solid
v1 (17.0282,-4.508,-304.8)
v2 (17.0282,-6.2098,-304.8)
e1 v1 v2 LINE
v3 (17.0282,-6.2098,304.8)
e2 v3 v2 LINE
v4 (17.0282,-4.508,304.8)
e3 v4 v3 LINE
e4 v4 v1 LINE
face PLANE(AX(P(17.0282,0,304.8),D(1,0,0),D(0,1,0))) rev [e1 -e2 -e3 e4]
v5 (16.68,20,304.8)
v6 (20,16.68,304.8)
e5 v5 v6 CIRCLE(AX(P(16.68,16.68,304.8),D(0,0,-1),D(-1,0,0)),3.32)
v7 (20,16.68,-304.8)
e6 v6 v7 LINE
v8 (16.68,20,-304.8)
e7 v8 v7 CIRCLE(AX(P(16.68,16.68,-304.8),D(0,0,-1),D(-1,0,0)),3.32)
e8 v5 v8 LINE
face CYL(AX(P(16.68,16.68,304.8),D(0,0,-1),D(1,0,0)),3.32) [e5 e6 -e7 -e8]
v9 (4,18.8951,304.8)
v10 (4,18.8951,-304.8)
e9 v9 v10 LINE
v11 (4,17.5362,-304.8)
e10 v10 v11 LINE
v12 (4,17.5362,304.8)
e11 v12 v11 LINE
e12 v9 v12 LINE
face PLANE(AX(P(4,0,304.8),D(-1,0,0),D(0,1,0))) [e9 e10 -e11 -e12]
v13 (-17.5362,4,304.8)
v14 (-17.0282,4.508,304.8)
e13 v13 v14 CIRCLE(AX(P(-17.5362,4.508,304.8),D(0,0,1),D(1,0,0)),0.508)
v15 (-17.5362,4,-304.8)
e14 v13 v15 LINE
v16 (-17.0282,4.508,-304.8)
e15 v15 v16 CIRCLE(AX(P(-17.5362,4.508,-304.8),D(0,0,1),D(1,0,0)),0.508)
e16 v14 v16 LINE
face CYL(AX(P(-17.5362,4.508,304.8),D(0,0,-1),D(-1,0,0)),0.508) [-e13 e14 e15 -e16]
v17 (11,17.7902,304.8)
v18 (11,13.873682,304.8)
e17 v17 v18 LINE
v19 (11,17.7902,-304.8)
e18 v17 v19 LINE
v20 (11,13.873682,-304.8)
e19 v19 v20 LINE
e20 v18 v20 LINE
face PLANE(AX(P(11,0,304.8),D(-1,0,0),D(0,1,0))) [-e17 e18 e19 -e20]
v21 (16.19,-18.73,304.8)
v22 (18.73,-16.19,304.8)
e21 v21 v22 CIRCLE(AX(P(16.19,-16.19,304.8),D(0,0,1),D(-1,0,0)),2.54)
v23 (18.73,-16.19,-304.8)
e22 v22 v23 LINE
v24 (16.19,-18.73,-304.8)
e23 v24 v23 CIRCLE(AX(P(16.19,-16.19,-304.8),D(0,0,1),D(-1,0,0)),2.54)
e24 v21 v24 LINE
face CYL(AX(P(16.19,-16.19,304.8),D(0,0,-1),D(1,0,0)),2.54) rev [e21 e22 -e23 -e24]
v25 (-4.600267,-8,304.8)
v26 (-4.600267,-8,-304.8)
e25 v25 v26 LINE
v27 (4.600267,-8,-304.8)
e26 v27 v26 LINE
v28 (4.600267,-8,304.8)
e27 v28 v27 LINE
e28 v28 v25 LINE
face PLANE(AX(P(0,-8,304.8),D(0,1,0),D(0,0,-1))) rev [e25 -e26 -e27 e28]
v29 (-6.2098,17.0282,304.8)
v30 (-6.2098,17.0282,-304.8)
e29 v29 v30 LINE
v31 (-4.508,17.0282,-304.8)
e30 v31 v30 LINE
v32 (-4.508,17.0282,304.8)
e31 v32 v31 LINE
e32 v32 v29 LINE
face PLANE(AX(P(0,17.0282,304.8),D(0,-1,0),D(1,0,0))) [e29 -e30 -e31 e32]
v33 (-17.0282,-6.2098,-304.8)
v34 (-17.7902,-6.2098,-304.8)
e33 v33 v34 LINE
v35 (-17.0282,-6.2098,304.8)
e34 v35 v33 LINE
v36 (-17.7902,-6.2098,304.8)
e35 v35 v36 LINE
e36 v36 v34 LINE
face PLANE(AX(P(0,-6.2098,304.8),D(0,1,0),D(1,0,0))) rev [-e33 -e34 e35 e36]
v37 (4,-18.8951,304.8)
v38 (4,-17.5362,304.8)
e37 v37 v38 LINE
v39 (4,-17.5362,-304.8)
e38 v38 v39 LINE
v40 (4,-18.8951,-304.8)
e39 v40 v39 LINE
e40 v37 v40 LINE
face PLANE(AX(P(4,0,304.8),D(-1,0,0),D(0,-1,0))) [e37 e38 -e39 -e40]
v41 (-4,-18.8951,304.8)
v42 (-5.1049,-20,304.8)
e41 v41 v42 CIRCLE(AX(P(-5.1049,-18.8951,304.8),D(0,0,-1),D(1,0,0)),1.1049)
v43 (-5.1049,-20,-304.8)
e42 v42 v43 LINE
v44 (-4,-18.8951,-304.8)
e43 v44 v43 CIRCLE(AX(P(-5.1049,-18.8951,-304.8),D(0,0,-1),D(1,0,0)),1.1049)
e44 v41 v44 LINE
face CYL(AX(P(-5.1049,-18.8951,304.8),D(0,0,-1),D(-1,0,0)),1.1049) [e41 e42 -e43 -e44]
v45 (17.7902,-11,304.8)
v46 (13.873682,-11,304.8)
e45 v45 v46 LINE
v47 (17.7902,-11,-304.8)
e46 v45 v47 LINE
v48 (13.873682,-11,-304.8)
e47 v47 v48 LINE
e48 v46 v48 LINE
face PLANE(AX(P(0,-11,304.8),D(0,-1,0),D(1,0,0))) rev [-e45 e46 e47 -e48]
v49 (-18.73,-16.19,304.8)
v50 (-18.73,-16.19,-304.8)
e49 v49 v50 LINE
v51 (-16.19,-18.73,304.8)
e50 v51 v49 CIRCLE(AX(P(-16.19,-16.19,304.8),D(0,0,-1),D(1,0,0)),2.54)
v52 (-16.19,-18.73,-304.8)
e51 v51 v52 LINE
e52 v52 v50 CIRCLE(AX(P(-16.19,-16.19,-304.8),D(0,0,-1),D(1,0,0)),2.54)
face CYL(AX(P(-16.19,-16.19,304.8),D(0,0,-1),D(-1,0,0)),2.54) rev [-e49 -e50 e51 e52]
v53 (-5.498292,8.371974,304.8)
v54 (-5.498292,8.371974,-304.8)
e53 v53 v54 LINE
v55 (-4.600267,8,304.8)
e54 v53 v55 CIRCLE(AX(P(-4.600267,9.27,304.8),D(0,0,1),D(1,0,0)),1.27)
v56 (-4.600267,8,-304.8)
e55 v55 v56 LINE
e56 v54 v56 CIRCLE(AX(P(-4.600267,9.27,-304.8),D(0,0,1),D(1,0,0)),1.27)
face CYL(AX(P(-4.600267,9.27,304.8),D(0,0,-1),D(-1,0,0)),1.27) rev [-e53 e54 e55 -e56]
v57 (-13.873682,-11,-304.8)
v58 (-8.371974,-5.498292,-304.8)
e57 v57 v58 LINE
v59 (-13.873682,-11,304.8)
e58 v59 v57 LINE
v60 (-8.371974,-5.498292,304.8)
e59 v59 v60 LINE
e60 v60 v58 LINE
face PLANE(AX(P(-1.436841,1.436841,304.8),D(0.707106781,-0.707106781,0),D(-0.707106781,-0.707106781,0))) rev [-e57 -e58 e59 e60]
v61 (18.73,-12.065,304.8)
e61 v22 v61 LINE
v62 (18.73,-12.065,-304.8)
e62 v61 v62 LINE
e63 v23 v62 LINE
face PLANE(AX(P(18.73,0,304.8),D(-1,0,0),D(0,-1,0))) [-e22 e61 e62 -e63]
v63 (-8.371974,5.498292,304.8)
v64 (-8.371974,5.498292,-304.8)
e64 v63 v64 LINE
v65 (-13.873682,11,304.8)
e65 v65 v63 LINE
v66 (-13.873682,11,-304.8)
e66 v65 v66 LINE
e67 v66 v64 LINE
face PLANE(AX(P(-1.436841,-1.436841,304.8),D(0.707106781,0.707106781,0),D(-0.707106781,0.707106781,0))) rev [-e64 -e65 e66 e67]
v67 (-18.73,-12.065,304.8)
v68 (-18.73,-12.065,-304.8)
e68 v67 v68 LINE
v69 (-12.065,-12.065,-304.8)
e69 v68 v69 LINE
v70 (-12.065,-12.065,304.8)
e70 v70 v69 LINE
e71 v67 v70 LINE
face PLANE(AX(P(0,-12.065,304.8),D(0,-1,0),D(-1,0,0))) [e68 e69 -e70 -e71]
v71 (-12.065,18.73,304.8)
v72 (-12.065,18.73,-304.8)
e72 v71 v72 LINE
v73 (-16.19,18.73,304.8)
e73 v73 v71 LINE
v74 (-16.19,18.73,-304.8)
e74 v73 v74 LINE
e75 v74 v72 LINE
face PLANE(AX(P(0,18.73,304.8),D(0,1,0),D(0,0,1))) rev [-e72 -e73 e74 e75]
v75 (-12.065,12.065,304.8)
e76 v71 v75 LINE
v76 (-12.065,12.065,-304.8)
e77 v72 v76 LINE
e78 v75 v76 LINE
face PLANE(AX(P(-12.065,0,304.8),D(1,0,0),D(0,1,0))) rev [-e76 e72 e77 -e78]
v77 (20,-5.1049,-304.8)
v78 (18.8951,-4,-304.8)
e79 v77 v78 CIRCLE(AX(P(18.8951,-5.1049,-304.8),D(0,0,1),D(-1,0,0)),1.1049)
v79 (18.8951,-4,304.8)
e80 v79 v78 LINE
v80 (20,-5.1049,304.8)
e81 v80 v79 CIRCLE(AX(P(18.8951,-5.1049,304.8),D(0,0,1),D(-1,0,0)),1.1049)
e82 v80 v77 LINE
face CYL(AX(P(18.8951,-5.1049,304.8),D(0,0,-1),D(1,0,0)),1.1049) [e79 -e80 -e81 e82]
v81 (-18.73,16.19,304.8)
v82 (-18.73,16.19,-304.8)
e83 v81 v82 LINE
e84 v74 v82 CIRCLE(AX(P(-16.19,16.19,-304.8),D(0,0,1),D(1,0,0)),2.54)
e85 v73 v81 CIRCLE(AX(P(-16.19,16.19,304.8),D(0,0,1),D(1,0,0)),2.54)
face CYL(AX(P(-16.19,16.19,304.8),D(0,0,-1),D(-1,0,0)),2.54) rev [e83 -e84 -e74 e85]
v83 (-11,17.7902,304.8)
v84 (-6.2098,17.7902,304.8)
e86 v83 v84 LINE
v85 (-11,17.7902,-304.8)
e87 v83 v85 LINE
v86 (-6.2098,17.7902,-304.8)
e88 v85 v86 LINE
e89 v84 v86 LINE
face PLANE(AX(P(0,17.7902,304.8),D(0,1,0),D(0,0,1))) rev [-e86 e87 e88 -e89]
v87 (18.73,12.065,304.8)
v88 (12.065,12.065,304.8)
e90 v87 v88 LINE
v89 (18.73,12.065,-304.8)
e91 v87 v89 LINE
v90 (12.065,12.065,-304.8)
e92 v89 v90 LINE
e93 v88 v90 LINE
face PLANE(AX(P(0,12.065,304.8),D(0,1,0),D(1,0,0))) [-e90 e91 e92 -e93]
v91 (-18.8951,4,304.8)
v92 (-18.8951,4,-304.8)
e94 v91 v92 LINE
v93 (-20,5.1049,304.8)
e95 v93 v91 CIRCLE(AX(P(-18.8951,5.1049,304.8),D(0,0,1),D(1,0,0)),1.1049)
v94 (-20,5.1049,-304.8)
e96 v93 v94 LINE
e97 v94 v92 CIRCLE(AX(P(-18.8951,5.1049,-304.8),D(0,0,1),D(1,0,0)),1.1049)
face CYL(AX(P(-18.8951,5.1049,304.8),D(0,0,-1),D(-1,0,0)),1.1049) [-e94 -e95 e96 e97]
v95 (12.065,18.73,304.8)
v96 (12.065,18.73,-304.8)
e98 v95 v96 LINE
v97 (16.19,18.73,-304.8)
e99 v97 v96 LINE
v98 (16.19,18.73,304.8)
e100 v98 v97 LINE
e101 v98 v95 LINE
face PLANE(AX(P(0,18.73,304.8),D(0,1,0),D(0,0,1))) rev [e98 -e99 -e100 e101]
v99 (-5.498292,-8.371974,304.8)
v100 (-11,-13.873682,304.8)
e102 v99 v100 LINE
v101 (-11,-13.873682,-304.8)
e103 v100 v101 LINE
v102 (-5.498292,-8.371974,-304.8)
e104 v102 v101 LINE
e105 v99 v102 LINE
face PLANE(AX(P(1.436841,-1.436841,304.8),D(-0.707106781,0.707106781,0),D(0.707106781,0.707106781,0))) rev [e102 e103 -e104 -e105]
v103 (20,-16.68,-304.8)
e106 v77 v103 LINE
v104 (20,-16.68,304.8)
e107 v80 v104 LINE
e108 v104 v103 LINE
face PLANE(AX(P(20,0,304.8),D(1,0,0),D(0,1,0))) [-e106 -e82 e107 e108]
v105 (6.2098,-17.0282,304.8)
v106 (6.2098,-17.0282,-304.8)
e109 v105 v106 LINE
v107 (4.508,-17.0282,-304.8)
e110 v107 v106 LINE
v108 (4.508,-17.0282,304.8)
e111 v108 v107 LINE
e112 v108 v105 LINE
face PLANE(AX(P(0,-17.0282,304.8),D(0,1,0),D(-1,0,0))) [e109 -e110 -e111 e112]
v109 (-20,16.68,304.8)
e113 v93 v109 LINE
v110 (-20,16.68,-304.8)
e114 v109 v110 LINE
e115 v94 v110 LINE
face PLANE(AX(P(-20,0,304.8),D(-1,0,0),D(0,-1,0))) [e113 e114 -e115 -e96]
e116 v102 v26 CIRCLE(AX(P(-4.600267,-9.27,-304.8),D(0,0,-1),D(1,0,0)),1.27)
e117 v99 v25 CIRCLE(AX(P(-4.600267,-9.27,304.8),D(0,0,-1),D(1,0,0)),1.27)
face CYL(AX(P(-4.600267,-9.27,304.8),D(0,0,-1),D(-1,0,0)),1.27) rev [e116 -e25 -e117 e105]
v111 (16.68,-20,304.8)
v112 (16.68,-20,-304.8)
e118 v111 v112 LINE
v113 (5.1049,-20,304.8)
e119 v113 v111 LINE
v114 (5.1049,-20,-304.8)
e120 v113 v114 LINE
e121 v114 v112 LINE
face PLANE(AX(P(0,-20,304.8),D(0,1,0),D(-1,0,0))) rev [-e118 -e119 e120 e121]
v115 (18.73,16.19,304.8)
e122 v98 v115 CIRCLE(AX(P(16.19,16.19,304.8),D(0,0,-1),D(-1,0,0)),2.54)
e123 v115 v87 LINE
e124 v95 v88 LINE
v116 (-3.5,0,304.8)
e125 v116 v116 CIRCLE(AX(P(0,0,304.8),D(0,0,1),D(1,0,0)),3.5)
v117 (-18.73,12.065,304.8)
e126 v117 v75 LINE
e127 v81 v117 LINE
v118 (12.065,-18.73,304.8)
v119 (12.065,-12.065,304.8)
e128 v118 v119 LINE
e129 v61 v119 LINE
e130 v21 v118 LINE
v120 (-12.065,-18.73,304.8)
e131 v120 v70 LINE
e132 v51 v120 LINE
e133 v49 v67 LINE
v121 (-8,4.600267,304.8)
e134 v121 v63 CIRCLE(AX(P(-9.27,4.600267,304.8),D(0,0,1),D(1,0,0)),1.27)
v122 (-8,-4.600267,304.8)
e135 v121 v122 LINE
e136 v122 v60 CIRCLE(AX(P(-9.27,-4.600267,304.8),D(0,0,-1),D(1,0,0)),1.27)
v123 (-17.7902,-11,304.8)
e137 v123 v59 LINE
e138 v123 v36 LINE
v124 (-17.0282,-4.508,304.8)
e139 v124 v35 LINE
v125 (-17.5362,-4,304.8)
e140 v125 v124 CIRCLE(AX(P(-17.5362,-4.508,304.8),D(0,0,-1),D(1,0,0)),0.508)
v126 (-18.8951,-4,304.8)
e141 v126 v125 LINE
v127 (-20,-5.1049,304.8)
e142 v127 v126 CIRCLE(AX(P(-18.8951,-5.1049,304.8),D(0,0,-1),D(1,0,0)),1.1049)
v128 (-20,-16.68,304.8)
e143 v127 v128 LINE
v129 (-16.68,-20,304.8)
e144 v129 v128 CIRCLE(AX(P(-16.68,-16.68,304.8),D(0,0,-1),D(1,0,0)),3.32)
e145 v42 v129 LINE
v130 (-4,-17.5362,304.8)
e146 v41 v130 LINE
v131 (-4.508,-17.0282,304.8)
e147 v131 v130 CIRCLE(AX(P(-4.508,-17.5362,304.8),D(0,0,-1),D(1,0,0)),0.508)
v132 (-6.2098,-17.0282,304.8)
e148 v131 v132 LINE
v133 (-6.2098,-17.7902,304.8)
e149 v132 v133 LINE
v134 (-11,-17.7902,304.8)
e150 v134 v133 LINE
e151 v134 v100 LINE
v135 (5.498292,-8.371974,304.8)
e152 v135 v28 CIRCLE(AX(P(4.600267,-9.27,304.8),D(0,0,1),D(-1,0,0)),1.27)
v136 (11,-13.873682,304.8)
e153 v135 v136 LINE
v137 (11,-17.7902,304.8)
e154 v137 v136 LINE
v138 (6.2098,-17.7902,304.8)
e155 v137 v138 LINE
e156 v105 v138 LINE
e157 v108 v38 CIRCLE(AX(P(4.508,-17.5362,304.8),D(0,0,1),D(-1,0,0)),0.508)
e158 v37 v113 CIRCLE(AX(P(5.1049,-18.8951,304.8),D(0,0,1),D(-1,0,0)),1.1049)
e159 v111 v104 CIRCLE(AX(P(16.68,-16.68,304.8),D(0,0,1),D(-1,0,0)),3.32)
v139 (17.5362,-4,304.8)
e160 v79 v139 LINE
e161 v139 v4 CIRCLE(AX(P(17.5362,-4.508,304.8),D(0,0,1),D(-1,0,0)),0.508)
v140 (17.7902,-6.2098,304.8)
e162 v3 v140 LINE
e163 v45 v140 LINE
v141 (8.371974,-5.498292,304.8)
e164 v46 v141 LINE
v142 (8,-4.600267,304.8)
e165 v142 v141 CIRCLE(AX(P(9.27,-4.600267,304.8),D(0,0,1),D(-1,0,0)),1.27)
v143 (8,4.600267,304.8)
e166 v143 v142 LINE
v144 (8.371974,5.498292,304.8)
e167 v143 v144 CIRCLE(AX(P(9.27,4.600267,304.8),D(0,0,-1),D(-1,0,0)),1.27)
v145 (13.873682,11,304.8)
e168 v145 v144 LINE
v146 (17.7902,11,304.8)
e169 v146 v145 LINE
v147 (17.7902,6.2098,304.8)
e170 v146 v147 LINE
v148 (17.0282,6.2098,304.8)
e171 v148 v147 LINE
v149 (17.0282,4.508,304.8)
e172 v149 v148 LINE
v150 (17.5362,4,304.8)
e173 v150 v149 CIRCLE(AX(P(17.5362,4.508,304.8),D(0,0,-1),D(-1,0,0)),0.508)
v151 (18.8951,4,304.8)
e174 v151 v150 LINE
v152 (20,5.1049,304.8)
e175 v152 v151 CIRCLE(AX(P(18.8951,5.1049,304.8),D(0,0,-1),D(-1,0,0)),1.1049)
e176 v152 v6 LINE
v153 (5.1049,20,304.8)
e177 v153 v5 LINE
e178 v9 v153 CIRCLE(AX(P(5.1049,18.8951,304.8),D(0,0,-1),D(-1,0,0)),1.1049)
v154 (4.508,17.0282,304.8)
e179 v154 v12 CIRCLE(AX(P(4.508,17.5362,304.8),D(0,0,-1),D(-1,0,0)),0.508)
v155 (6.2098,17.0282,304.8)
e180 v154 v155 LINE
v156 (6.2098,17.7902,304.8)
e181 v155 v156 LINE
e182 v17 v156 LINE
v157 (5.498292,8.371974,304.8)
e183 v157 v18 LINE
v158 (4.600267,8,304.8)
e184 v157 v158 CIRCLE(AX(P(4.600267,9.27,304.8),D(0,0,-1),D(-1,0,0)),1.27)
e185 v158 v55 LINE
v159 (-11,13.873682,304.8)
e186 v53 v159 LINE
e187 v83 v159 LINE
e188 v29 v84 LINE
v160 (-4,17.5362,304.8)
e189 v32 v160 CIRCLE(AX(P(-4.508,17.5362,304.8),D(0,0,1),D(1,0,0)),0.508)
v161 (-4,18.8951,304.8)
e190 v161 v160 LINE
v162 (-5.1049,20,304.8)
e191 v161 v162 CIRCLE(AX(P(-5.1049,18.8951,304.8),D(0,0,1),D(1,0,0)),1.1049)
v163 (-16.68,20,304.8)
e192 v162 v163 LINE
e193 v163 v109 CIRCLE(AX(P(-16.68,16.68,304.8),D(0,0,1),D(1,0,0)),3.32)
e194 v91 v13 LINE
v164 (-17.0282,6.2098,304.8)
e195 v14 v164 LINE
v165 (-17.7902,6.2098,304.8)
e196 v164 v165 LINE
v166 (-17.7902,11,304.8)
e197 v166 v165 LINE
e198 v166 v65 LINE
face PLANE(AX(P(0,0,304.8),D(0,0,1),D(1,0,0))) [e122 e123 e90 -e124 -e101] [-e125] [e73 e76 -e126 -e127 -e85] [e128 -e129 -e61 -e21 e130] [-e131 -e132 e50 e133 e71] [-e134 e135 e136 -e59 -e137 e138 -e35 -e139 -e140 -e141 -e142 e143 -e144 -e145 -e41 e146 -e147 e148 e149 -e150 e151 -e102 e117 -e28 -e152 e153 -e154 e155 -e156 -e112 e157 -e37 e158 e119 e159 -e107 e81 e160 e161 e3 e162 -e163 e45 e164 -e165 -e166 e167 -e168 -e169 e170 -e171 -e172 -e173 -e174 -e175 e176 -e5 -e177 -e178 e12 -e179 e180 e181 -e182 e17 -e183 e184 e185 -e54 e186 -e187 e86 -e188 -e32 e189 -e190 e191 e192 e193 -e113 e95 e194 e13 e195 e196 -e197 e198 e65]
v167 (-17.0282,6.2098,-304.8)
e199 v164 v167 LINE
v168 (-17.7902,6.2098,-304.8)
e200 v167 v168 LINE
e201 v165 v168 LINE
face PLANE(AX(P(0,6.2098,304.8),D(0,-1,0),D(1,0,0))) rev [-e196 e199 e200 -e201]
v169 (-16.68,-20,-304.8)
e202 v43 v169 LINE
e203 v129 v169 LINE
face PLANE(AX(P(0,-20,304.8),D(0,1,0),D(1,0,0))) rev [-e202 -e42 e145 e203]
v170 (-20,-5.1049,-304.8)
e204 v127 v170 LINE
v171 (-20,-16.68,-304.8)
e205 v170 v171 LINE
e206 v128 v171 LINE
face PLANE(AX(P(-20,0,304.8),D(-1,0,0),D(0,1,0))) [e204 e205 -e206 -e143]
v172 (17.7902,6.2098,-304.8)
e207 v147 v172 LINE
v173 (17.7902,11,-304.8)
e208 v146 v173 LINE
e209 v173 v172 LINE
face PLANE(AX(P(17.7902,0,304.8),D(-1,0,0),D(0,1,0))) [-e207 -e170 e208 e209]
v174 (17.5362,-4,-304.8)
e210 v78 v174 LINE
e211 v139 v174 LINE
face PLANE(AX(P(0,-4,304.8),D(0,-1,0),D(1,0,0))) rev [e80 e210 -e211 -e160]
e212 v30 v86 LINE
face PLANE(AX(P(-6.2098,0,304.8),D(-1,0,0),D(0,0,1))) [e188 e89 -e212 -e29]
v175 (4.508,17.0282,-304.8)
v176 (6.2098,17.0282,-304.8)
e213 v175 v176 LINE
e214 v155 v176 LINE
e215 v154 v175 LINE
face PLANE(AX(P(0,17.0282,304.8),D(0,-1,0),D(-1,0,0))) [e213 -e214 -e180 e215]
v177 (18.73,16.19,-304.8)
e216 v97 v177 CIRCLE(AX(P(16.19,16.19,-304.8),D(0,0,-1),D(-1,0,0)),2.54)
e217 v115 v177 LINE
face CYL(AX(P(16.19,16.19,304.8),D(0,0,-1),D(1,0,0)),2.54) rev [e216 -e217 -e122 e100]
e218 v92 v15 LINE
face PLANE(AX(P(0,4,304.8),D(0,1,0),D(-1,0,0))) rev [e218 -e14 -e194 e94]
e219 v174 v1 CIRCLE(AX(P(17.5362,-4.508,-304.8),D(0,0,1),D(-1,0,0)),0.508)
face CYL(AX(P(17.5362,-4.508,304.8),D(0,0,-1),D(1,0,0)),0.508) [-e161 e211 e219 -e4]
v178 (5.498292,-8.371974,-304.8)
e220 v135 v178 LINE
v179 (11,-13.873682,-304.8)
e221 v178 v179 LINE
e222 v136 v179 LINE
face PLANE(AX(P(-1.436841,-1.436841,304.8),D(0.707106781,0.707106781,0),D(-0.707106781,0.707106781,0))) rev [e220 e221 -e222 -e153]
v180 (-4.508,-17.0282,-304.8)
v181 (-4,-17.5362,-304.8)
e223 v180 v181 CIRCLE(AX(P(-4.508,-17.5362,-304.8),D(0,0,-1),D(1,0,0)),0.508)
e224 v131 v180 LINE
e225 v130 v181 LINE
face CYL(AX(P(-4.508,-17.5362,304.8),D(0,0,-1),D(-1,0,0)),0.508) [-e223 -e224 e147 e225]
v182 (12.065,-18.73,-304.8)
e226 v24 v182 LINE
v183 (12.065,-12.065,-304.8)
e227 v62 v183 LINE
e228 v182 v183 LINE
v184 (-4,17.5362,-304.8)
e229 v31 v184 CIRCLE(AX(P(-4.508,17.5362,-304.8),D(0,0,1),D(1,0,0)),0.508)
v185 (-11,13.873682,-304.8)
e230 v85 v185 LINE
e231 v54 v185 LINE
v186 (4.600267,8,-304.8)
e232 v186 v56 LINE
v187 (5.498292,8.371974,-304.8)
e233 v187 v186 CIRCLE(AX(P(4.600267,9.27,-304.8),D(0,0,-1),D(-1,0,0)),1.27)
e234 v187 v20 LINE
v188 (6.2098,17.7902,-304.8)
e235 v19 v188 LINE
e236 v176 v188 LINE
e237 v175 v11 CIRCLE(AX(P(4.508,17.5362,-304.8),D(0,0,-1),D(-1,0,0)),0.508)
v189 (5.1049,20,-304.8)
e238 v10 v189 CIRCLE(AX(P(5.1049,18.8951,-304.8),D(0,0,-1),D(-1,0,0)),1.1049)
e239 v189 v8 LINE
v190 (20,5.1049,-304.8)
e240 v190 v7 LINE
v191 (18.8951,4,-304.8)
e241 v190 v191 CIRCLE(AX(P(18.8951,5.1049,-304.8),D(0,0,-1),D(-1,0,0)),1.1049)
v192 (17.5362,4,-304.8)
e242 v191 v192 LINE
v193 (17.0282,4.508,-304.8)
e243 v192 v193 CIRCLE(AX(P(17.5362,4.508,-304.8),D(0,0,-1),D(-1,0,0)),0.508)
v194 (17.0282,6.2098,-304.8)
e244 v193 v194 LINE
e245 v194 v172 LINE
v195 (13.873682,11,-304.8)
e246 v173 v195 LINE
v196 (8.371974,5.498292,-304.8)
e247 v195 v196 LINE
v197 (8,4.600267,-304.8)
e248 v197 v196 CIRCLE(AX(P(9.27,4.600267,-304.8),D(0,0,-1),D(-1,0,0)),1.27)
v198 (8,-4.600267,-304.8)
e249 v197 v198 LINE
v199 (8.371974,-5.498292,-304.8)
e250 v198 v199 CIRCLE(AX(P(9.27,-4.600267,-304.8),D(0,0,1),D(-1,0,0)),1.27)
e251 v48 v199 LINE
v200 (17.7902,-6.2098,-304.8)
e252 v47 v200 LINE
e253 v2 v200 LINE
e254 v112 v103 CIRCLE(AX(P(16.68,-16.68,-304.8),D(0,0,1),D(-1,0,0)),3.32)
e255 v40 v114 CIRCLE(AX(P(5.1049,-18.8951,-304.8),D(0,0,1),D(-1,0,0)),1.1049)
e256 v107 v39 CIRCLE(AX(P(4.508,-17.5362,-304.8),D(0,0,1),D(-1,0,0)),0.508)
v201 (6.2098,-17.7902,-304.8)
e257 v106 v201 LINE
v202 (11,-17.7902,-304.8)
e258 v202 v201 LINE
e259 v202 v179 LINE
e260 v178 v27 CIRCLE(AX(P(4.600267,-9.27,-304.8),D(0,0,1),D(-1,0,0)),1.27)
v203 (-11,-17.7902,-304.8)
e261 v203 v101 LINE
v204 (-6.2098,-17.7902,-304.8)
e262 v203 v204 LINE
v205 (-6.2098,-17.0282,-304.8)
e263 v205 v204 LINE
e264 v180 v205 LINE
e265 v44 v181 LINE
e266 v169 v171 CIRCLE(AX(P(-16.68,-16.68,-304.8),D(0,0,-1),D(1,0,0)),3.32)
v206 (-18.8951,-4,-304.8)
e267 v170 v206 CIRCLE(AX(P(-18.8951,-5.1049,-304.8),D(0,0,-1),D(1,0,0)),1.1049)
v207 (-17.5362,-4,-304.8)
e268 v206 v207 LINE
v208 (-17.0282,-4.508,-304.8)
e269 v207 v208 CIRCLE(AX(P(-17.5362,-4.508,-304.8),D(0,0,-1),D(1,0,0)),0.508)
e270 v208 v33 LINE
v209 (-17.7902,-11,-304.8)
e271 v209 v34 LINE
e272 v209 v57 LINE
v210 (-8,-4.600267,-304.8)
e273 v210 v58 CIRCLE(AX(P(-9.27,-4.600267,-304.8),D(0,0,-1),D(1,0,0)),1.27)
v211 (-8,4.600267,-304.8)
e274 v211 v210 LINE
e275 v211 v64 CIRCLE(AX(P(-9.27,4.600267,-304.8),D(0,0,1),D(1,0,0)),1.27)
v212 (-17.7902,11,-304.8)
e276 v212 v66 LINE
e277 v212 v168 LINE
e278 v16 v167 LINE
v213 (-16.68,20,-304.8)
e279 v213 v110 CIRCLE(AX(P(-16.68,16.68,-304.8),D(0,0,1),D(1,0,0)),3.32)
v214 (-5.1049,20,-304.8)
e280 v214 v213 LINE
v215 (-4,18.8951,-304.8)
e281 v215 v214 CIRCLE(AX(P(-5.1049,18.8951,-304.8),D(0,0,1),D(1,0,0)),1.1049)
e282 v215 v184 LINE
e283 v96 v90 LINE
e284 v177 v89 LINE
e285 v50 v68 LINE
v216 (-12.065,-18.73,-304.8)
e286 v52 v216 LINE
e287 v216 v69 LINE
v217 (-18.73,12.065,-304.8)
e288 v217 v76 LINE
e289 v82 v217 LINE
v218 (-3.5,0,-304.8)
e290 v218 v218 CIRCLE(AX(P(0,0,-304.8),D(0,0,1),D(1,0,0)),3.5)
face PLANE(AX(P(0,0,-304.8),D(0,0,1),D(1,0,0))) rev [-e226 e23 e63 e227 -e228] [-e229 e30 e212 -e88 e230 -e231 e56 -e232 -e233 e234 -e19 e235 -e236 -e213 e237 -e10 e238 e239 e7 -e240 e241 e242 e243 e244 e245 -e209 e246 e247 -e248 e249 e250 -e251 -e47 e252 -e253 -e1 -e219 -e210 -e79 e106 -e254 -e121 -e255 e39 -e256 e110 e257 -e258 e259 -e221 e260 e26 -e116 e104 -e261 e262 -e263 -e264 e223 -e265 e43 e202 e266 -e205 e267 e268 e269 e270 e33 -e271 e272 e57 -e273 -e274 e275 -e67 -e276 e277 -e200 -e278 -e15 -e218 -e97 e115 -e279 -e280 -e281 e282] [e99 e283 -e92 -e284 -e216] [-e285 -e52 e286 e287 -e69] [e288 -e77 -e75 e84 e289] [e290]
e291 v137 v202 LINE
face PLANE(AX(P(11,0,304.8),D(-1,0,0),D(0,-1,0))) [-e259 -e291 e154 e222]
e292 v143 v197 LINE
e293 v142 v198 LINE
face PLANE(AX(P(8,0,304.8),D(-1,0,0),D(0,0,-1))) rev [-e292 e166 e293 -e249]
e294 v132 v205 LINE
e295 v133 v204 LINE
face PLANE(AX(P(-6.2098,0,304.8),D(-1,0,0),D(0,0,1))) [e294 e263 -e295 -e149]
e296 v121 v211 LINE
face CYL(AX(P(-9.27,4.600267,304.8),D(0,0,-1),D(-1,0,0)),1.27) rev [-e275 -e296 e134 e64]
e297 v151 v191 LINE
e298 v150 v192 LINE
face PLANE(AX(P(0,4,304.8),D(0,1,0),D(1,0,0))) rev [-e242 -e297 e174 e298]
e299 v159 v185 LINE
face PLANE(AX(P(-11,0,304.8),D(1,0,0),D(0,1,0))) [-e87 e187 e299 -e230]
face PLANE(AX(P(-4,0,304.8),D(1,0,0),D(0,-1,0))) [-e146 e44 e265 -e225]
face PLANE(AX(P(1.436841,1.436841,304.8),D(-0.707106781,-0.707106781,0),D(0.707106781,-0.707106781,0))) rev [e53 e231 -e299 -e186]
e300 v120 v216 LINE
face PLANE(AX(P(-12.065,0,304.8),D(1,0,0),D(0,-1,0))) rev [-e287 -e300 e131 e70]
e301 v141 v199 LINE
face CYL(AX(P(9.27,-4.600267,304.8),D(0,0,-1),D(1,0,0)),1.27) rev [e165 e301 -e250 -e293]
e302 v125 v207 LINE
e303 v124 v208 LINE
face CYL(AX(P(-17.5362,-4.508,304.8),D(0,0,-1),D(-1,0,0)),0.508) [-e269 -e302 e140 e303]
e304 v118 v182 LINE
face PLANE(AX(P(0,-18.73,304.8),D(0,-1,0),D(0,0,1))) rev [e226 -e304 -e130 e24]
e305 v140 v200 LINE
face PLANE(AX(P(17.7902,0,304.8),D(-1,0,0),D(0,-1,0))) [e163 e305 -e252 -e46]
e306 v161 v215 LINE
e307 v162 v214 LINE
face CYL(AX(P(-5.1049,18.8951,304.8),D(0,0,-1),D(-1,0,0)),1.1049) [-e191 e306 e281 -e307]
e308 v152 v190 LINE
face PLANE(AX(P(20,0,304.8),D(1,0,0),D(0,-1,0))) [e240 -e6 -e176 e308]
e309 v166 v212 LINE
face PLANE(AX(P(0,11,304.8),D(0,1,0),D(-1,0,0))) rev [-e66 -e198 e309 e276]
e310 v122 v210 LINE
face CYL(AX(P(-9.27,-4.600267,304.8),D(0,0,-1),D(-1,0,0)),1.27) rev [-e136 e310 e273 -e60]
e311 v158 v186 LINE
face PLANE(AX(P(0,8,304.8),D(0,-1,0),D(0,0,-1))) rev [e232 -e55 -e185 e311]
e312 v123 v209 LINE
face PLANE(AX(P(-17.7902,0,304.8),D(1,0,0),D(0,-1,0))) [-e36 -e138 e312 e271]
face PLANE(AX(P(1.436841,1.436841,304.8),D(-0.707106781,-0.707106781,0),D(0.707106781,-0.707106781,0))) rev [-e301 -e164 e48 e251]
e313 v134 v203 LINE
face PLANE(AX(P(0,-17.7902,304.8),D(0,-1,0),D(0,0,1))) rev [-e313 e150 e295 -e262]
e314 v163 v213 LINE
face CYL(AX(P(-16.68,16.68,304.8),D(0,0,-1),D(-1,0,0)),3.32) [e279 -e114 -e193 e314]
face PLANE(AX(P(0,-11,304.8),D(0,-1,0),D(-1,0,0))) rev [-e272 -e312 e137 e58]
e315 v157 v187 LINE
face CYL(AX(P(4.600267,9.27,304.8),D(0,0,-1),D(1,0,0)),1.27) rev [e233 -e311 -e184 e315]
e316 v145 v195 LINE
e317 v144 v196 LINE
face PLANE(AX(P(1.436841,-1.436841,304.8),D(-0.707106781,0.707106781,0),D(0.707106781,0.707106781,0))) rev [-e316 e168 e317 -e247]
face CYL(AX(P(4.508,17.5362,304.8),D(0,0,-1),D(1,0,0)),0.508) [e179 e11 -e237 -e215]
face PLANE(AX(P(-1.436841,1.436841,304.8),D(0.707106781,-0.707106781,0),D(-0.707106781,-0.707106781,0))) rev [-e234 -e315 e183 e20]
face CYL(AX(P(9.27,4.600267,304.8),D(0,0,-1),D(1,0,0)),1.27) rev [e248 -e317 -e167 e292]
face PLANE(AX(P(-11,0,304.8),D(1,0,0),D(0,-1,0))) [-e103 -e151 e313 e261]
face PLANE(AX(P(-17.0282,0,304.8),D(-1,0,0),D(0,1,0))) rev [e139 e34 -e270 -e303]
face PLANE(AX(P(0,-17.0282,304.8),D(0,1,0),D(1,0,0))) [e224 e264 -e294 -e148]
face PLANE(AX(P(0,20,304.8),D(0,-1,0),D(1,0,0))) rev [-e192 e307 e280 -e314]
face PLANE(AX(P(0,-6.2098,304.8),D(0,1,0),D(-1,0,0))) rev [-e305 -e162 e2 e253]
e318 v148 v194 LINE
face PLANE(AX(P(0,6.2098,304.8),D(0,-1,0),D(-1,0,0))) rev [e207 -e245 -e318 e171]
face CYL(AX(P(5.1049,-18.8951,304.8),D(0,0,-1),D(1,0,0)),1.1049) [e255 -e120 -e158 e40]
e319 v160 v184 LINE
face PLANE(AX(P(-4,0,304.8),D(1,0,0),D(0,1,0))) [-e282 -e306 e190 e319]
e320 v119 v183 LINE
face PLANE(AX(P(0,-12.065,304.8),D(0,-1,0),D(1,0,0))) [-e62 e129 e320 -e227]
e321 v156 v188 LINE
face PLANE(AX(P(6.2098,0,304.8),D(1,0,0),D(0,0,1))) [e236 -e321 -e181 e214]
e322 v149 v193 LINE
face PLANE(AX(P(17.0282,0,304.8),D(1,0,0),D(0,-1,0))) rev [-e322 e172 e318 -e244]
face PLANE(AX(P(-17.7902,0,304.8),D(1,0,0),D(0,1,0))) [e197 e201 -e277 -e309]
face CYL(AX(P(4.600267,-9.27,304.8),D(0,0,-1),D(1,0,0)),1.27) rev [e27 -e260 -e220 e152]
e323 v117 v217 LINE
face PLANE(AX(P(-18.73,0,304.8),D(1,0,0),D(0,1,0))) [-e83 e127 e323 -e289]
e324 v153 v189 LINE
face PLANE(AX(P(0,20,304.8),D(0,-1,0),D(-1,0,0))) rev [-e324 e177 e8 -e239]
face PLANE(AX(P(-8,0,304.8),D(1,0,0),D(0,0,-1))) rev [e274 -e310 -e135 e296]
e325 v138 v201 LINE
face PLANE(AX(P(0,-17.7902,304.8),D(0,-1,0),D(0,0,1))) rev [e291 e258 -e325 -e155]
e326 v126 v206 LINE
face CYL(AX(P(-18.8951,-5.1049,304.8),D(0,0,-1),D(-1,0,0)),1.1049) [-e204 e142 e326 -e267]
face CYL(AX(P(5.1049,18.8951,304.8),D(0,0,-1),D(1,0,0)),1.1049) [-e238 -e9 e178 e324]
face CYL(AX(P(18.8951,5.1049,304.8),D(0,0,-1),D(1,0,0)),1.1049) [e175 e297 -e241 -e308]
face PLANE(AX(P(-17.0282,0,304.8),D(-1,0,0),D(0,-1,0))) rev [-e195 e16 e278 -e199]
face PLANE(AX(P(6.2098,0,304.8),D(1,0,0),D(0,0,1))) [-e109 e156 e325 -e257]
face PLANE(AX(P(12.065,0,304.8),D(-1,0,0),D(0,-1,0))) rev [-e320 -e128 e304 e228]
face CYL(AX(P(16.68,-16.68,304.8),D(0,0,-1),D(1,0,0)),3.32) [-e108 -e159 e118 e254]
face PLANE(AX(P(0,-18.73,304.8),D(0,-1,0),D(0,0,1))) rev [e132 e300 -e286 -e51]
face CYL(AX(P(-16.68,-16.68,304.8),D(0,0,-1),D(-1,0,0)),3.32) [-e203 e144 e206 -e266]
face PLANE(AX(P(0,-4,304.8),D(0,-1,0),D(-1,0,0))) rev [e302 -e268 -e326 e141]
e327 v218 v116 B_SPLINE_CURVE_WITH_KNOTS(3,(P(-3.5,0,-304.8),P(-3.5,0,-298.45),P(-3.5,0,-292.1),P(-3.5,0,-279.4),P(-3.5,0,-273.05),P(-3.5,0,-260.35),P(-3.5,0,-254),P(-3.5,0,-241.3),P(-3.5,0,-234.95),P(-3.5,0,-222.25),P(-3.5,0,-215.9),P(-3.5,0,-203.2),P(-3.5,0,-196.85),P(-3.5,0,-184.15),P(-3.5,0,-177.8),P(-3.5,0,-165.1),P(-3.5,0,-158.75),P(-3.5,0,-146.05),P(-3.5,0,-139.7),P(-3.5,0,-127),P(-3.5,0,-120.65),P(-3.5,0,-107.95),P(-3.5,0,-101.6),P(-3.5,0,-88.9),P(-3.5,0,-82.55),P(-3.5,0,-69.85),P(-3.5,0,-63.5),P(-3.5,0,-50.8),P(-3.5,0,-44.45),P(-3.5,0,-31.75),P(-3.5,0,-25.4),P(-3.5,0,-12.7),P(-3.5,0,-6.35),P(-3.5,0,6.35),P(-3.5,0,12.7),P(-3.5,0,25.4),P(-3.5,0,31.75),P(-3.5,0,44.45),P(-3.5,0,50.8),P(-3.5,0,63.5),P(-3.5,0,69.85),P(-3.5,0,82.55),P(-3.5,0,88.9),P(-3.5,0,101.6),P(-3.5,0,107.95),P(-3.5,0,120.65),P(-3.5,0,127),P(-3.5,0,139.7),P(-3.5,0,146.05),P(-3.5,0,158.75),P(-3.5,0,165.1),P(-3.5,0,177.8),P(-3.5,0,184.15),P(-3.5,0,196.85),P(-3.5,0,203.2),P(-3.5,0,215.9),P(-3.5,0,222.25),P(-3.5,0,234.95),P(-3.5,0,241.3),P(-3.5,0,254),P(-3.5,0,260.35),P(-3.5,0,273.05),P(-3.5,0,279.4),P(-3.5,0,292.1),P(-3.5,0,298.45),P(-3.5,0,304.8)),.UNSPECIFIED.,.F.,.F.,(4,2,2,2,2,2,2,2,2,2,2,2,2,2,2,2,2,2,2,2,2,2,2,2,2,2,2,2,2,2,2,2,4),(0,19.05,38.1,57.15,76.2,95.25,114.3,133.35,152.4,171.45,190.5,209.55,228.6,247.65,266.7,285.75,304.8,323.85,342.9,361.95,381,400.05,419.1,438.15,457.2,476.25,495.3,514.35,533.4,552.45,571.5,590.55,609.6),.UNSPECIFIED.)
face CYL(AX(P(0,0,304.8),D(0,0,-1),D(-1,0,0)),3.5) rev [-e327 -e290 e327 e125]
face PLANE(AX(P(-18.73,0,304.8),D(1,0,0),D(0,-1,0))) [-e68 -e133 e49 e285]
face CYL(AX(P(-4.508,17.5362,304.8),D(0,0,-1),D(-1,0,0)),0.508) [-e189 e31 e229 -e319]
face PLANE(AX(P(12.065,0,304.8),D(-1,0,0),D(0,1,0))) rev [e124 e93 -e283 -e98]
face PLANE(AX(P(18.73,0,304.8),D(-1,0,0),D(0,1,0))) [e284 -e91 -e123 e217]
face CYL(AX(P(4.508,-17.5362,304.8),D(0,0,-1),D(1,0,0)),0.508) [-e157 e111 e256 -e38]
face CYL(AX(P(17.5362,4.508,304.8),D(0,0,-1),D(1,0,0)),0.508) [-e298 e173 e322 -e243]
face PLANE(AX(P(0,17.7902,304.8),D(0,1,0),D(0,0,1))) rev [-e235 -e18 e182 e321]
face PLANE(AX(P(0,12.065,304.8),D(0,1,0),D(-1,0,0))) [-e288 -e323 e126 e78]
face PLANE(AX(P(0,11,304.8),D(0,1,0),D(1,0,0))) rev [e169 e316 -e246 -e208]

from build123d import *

# Parameters (mm, degrees)
BOSS_EXTRUDE1_DEPTH = 304.8
MIRROR3_START       = -304.8
MIRROR3_DEPTH       = 609.6


# Read off the part's stored shape, not the designer's step: Mirror3
with BuildPart() as part:
    # Sketch3 → Boss-Extrude1 (new, symmetric)
    with BuildSketch(Plane.XY):
        with BuildLine():
            Line((0, 8), (0, 3.5))
            ThreePointArc((0, 3.5), (-2.474873734, 2.474873734), (-3.5, 0))
            Line((-3.5, 0), (-8, 0))
            Line((-8, 0), (-8, 4.600266817))
            ThreePointArc((-8, 4.600266817), (-8.096672994, 5.086274776), (-8.371974388, 5.498292429))
            Line((-8.371974388, 5.498292429), (-13.873681959, 11))
            Line((-13.873681959, 11), (-17.7902, 11))
            Line((-17.7902, 11), (-17.7902, 6.2098))
            Line((-17.7902, 6.2098), (-17.0282, 6.2098))
            Line((-17.0282, 6.2098), (-17.0282, 4.508))
            ThreePointArc((-17.0282, 4.508), (-17.176989755, 4.148789755), (-17.5362, 4))
            Line((-17.5362, 4), (-18.8951, 4))
            ThreePointArc((-18.8951, 4), (-19.676382283, 4.323617717), (-20, 5.1049))
            Line((-20, 5.1049), (-20, 16.68))
            ThreePointArc((-20, 16.68), (-19.027594514, 19.027594514), (-16.68, 20))
            Line((-16.68, 20), (-5.1049, 20))
            ThreePointArc((-5.1049, 20), (-4.323617717, 19.676382283), (-4, 18.8951))
            Line((-4, 18.8951), (-4, 17.5362))
            ThreePointArc((-4, 17.5362), (-4.148789755, 17.176989755), (-4.508, 17.0282))
            Line((-4.508, 17.0282), (-6.2098, 17.0282))
            Line((-6.2098, 17.0282), (-6.2098, 17.7902))
            Line((-6.2098, 17.7902), (-11, 17.7902))
            Line((-11, 17.7902), (-11, 13.873681959))
            Line((-11, 13.873681959), (-5.498292429, 8.371974388))
            ThreePointArc((-5.498292429, 8.371974388), (-5.086274776, 8.096672994), (-4.600266817, 8))
            Line((-4.600266817, 8), (0, 8))
        make_face()
        with BuildLine():
            Line((-12.065, 18.73), (-12.065, 12.065))
            Line((-12.065, 12.065), (-18.73, 12.065))
            Line((-18.73, 12.065), (-18.73, 16.19))
            ThreePointArc((-18.73, 16.19), (-17.986051224, 17.986051224), (-16.19, 18.73))
            Line((-16.19, 18.73), (-12.065, 18.73))
        make_face(mode=Mode.SUBTRACT)
    extrude(amount=BOSS_EXTRUDE1_DEPTH, both=True)

    # Mirror1: part across plane


with BuildPart() as part_1:
    add(part.part)
    add(part.part.mirror(Plane(origin=(0, 0, 304.8), x_dir=(0, 0, 1), z_dir=(1, 0, 0))))

    # Mirror3 outline → Mirror3 (add)
    with BuildSketch(Plane.XY.offset(MIRROR3_START)):
        with BuildLine():
            Line((-8, 0), (-8, -4.600266817))
            ThreePointArc((-8, -4.600266817), (-8.096672994, -5.086274776), (-8.371974388, -5.498292429))
            Line((-8.371974388, -5.498292429), (-13.873681959, -11))
            Line((-13.873681959, -11), (-17.7902, -11))
            Line((-17.7902, -11), (-17.7902, -6.2098))
            Line((-17.7902, -6.2098), (-17.0282, -6.2098))
            Line((-17.0282, -6.2098), (-17.0282, -4.508))
            ThreePointArc((-17.0282, -4.508), (-17.176989755, -4.148789755), (-17.5362, -4))
            Line((-17.5362, -4), (-18.8951, -4))
            ThreePointArc((-18.8951, -4), (-19.676382283, -4.323617717), (-20, -5.1049))
            Line((-20, -5.1049), (-20, -16.68))
            ThreePointArc((-20, -16.68), (-19.027594514, -19.027594514), (-16.68, -20))
            Line((-16.68, -20), (-5.1049, -20))
            ThreePointArc((-5.1049, -20), (-4.323617717, -19.676382283), (-4, -18.8951))
            Line((-4, -18.8951), (-4, -17.5362))
            ThreePointArc((-4, -17.5362), (-4.148789755, -17.176989755), (-4.508, -17.0282))
            Line((-4.508, -17.0282), (-6.2098, -17.0282))
            Line((-6.2098, -17.0282), (-6.2098, -17.7902))
            Line((-6.2098, -17.7902), (-11, -17.7902))
            Line((-11, -17.7902), (-11, -13.873681959))
            Line((-11, -13.873681959), (-5.498292429, -8.371974388))
            ThreePointArc((-5.498292429, -8.371974388), (-5.086274776, -8.096672994), (-4.600266817, -8))
            Line((-4.600266817, -8), (4.600266817, -8))
            ThreePointArc((4.600266817, -8), (5.086274776, -8.096672994), (5.498292429, -8.371974388))
            Line((5.498292429, -8.371974388), (11, -13.873681959))
            Line((11, -13.873681959), (11, -17.7902))
            Line((11, -17.7902), (6.2098, -17.7902))
            Line((6.2098, -17.7902), (6.2098, -17.0282))
            Line((6.2098, -17.0282), (4.508, -17.0282))
            ThreePointArc((4.508, -17.0282), (4.148789755, -17.176989755), (4, -17.5362))
            Line((4, -17.5362), (4, -18.8951))
            ThreePointArc((4, -18.8951), (4.323617717, -19.676382283), (5.1049, -20))
            Line((5.1049, -20), (16.68, -20))
            ThreePointArc((16.68, -20), (19.027594514, -19.027594514), (20, -16.68))
            Line((20, -16.68), (20, -5.1049))
            ThreePointArc((20, -5.1049), (19.676382283, -4.323617717), (18.8951, -4))
            Line((18.8951, -4), (17.5362, -4))
            ThreePointArc((17.5362, -4), (17.176989755, -4.148789755), (17.0282, -4.508))
            Line((17.0282, -4.508), (17.0282, -6.2098))
            Line((17.0282, -6.2098), (17.7902, -6.2098))
            Line((17.7902, -6.2098), (17.7902, -11))
            Line((17.7902, -11), (13.873681959, -11))
            Line((13.873681959, -11), (8.371974388, -5.498292429))
            ThreePointArc((8.371974388, -5.498292429), (8.096672994, -5.086274776), (8, -4.600266817))
            Line((8, -4.600266817), (8, 0))
            Line((8, 0), (3.5, 0))
            ThreePointArc((3.5, 0), (0, -3.5), (-3.5, 0))
            Line((-3.5, 0), (-8, 0))
        make_face()
        with BuildLine():
            Line((-12.065, -12.065), (-12.065, -18.73))
            Line((-12.065, -18.73), (-16.19, -18.73))
            ThreePointArc((-16.19, -18.73), (-17.986051224, -17.986051224), (-18.73, -16.19))
            Line((-18.73, -16.19), (-18.73, -12.065))
            Line((-18.73, -12.065), (-12.065, -12.065))
        make_face(mode=Mode.SUBTRACT)
        with BuildLine():
            Line((12.065, -18.73), (12.065, -12.065))
            Line((12.065, -12.065), (18.73, -12.065))
            Line((18.73, -12.065), (18.73, -16.19))
            ThreePointArc((18.73, -16.19), (17.986051224, -17.986051224), (16.19, -18.73))
            Line((16.19, -18.73), (12.065, -18.73))
        make_face(mode=Mode.SUBTRACT)
    extrude(amount=MIRROR3_DEPTH)


solid = part_1.part
